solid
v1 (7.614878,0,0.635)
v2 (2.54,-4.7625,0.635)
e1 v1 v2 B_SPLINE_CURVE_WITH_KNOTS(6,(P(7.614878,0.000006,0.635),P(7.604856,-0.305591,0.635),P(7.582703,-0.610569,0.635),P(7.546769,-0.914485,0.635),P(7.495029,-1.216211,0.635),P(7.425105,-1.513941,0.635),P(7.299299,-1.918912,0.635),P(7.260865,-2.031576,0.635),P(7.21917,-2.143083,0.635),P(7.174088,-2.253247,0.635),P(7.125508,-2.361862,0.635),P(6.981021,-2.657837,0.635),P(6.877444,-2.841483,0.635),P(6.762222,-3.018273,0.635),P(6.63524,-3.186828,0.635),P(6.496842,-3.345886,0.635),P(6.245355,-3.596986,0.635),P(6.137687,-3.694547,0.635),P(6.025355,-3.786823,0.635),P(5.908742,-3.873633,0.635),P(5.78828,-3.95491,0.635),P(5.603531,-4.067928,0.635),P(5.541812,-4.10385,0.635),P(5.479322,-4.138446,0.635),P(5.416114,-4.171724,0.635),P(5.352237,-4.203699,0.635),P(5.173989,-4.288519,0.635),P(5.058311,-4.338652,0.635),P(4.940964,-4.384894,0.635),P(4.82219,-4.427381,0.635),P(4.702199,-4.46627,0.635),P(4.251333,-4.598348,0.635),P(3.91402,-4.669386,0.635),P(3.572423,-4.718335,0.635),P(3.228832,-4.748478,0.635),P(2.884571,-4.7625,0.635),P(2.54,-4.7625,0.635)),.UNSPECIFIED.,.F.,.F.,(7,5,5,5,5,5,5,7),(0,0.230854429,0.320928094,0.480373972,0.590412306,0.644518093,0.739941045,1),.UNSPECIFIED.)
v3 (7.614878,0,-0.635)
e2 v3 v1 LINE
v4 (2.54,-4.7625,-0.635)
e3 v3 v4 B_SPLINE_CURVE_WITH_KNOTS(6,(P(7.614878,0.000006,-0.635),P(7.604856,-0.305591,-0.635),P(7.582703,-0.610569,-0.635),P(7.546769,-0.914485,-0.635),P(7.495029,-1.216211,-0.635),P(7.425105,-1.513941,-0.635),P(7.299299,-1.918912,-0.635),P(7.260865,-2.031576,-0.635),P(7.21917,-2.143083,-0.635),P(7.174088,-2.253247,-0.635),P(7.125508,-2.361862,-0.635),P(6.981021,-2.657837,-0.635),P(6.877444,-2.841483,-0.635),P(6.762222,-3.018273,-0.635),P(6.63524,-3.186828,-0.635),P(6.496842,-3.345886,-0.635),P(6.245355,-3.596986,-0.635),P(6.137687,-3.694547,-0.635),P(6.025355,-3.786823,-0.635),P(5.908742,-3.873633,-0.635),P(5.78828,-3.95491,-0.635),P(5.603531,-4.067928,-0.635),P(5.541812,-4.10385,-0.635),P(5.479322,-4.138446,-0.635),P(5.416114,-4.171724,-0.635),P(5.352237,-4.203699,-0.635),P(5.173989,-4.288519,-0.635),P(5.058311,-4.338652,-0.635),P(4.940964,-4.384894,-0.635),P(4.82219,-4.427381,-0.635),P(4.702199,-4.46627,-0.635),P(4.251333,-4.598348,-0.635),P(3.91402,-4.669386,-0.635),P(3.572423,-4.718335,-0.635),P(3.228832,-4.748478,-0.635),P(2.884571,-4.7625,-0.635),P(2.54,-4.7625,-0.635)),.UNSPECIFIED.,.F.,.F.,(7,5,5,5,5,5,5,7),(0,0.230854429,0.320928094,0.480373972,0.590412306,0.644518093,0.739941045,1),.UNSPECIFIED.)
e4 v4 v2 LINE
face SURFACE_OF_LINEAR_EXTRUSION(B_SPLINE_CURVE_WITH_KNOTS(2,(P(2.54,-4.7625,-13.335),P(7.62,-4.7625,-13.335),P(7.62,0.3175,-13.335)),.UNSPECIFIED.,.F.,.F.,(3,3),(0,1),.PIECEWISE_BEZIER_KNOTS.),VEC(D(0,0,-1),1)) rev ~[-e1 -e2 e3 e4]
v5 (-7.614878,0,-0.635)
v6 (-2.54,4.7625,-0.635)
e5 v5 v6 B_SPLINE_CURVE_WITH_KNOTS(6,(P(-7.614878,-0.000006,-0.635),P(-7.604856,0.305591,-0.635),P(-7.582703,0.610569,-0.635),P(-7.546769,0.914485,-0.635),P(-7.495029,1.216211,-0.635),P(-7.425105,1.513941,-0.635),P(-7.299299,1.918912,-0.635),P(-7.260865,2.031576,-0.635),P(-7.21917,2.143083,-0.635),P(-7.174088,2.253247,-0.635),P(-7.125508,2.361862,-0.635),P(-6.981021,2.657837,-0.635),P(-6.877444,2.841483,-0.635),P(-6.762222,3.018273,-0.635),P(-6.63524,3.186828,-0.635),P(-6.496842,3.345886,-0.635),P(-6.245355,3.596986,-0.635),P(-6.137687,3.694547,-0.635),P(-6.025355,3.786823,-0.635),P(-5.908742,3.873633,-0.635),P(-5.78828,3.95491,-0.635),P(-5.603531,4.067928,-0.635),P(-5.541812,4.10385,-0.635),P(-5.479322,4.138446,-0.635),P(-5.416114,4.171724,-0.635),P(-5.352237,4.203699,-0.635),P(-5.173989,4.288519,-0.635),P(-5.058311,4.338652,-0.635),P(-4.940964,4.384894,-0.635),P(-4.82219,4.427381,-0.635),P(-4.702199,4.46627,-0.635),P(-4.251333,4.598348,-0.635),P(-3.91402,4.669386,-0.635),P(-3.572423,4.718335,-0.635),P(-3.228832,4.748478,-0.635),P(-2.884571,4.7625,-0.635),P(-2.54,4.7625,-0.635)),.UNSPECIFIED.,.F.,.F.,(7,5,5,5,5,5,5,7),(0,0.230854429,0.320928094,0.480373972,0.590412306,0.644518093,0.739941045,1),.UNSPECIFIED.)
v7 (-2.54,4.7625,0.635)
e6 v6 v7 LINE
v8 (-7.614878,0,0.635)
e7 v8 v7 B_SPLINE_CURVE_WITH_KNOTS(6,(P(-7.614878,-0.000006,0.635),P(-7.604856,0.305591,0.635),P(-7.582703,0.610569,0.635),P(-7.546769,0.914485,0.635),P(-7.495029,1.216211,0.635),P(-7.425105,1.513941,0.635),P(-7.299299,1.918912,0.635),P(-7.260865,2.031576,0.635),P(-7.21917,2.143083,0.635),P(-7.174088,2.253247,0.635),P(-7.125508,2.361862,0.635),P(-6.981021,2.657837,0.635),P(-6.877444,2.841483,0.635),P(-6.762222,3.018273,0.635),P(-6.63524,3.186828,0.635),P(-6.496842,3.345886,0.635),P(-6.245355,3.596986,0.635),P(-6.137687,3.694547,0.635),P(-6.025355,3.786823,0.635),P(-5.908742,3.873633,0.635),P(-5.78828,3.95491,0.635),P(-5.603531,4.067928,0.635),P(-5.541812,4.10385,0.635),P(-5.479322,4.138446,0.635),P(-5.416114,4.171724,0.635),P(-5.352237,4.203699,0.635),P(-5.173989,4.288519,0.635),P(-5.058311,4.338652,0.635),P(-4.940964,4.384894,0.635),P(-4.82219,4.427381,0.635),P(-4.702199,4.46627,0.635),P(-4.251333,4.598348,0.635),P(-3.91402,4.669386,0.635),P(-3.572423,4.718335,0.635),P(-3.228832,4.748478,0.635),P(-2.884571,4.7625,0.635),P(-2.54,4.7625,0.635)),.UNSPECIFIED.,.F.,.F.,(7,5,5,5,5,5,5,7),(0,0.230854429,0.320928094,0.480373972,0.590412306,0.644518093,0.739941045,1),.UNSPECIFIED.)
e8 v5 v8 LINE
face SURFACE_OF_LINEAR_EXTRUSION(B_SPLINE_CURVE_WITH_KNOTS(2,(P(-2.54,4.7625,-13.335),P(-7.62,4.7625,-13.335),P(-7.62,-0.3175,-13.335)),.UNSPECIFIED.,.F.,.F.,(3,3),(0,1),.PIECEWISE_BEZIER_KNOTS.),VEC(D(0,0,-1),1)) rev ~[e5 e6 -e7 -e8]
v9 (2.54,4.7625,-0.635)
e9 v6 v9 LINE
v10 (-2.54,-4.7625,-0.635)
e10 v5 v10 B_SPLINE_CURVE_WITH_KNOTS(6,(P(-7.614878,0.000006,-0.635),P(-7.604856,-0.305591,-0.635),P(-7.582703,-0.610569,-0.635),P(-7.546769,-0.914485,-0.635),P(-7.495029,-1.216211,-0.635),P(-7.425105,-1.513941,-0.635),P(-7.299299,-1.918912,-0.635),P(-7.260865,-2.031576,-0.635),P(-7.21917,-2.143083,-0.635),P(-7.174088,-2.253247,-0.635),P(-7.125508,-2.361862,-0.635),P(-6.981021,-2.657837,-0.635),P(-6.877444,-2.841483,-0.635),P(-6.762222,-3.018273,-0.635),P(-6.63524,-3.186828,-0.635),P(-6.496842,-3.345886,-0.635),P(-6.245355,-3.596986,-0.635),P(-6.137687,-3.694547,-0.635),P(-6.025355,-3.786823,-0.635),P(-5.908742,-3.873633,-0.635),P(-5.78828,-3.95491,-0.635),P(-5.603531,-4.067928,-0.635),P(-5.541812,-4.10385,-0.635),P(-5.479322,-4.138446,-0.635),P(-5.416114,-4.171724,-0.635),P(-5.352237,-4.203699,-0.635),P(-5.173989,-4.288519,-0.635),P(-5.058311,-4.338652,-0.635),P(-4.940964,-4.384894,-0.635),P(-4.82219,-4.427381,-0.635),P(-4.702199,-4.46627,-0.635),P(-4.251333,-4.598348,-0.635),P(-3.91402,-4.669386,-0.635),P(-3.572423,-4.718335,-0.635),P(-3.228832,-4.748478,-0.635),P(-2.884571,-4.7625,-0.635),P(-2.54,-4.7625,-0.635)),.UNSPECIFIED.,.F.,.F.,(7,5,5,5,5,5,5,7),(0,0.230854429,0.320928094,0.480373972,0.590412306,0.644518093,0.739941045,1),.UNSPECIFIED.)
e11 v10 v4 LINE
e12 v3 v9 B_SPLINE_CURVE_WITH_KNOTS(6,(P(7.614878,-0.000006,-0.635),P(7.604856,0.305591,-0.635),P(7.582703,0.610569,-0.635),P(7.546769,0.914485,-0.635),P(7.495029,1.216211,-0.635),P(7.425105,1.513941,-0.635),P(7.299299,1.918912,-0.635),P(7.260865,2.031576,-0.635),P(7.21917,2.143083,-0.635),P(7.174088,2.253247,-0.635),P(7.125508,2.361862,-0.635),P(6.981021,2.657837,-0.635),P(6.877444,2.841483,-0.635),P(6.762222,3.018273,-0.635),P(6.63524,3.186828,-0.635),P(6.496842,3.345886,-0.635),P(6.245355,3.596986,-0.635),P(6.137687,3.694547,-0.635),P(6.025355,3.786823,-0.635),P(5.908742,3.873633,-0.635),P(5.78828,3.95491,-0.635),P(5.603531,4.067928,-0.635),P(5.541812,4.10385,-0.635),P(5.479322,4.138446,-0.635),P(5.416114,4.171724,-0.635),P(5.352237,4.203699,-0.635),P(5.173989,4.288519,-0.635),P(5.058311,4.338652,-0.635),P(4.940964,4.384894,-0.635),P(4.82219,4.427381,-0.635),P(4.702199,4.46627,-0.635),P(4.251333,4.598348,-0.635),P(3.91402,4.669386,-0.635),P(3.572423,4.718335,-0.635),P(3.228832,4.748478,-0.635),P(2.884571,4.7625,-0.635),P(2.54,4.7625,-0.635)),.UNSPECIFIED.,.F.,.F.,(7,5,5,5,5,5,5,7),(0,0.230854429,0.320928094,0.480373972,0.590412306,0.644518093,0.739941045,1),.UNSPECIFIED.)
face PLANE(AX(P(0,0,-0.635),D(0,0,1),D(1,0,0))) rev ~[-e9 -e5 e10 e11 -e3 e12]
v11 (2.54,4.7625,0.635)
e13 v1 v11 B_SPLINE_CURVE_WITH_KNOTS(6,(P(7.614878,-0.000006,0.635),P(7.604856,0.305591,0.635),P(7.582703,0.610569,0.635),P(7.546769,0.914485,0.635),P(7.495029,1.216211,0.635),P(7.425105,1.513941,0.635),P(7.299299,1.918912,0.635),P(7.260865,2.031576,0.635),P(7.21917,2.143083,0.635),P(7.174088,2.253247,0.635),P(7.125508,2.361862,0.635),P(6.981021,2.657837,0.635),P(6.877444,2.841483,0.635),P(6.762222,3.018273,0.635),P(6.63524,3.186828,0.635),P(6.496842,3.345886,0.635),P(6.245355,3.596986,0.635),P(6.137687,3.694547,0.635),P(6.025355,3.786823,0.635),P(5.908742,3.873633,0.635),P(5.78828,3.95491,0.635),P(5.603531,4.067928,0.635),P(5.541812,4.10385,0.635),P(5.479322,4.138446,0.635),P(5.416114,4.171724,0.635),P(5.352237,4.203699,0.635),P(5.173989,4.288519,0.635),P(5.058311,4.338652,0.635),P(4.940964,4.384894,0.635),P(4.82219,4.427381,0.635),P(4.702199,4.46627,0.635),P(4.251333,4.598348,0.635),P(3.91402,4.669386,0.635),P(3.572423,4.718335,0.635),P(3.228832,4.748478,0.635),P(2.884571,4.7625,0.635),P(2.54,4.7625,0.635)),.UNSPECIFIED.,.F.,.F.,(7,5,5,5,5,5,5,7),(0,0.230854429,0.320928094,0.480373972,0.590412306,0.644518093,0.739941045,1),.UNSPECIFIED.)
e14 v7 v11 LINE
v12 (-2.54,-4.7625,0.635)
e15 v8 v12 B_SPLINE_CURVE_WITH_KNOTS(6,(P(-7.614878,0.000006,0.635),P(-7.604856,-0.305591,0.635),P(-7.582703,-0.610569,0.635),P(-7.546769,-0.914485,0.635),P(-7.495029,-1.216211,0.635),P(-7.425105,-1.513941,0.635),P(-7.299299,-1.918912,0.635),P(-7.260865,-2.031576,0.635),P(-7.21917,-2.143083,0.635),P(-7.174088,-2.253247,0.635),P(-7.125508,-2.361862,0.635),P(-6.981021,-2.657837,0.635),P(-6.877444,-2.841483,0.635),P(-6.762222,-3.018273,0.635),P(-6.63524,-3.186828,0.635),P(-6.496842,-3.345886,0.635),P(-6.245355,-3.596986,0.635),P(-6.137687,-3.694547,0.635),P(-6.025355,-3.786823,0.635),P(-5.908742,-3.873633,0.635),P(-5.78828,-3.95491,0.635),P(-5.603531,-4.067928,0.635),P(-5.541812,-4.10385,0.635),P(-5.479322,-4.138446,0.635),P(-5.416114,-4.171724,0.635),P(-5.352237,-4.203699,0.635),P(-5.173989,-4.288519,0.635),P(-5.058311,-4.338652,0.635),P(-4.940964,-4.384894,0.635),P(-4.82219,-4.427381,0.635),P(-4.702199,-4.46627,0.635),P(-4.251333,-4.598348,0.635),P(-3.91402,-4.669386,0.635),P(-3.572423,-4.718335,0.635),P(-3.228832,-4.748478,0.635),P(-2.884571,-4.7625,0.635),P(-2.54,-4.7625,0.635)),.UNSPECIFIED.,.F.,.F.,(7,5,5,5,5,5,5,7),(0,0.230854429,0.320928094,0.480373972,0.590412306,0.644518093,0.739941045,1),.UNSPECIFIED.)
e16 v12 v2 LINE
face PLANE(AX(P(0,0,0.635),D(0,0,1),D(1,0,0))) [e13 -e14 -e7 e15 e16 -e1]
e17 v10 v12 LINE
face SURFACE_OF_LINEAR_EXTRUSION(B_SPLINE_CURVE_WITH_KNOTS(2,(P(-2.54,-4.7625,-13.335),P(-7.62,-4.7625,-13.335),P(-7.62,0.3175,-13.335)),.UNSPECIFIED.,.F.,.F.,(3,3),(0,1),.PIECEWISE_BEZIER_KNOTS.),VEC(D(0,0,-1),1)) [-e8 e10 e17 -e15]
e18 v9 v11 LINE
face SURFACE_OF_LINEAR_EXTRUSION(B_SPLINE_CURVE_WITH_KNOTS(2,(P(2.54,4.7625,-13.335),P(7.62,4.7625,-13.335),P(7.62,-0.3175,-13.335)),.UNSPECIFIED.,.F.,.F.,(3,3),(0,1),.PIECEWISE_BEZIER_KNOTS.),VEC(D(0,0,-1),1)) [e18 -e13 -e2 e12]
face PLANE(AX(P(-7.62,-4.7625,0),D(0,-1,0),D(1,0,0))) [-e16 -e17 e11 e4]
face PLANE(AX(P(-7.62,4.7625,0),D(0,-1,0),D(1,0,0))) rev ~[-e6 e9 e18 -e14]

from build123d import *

# Parameters (mm, degrees)
F0_W          = 15.24
F0_H          = 9.525
F1_DEPTH      = 0.635
F1_DEPTH_BACK = 0.635
F2_T1_DEPTH   = 26.67


# Not quite as in the source:
# - a fillet or chamfer that OpenCascade refuses, or shapes differently, is made with other operations: its cross-section is extruded or revolved along the edge and cut away or added


with BuildPart() as f1:
    # F0 (on Top) → F1 (new body, two sides)
    with BuildSketch(Plane.XY) as f1_sk:
        Rectangle(F0_W, F0_H)
    extrude(amount=F1_DEPTH)
    extrude(f1_sk.sketch, amount=-F1_DEPTH_BACK)

    # F2: fillet of radius 5.08 on 4 edges, made by hand

    # F2_s2 → F2_t1 (cut)
    with BuildSketch(Plane.XY.offset(-13.335)):
        with BuildLine():
            add(Edge.make_bspline(
                [(-2.54, -4.7625), (-7.62, -4.7625), (-7.62, 0.3175)],
                knots=[0, 0, 0, 1, 1, 1], degree=2, weights=[1, 1, 1]))
            Line((-7.62, 0.3175), (-7.62, -4.7625))
            Line((-7.62, -4.7625), (-2.54, -4.7625))
        make_face()
        with BuildLine():
            add(Edge.make_bspline(
                [(2.54, -4.7625), (7.62, -4.7625), (7.62, 0.3175)],
                knots=[0, 0, 0, 1, 1, 1], degree=2, weights=[1, 1, 1]))
            Line((7.62, 0.3175), (7.62, -4.7625))
            Line((7.62, -4.7625), (2.54, -4.7625))
        make_face()
        with BuildLine():
            add(Edge.make_bspline(
                [(2.54, 4.7625), (7.62, 4.7625), (7.62, -0.3175)],
                knots=[0, 0, 0, 1, 1, 1], degree=2, weights=[1, 1, 1]))
            Line((7.62, -0.3175), (7.62, 4.7625))
            Line((7.62, 4.7625), (2.54, 4.7625))
        make_face()
        with BuildLine():
            add(Edge.make_bspline(
                [(-2.54, 4.7625), (-7.62, 4.7625), (-7.62, -0.3175)],
                knots=[0, 0, 0, 1, 1, 1], degree=2, weights=[1, 1, 1]))
            Line((-7.62, -0.3175), (-7.62, 4.7625))
            Line((-7.62, 4.7625), (-2.54, 4.7625))
        make_face()
    extrude(amount=F2_T1_DEPTH, mode=Mode.SUBTRACT)


solid = f1.part
